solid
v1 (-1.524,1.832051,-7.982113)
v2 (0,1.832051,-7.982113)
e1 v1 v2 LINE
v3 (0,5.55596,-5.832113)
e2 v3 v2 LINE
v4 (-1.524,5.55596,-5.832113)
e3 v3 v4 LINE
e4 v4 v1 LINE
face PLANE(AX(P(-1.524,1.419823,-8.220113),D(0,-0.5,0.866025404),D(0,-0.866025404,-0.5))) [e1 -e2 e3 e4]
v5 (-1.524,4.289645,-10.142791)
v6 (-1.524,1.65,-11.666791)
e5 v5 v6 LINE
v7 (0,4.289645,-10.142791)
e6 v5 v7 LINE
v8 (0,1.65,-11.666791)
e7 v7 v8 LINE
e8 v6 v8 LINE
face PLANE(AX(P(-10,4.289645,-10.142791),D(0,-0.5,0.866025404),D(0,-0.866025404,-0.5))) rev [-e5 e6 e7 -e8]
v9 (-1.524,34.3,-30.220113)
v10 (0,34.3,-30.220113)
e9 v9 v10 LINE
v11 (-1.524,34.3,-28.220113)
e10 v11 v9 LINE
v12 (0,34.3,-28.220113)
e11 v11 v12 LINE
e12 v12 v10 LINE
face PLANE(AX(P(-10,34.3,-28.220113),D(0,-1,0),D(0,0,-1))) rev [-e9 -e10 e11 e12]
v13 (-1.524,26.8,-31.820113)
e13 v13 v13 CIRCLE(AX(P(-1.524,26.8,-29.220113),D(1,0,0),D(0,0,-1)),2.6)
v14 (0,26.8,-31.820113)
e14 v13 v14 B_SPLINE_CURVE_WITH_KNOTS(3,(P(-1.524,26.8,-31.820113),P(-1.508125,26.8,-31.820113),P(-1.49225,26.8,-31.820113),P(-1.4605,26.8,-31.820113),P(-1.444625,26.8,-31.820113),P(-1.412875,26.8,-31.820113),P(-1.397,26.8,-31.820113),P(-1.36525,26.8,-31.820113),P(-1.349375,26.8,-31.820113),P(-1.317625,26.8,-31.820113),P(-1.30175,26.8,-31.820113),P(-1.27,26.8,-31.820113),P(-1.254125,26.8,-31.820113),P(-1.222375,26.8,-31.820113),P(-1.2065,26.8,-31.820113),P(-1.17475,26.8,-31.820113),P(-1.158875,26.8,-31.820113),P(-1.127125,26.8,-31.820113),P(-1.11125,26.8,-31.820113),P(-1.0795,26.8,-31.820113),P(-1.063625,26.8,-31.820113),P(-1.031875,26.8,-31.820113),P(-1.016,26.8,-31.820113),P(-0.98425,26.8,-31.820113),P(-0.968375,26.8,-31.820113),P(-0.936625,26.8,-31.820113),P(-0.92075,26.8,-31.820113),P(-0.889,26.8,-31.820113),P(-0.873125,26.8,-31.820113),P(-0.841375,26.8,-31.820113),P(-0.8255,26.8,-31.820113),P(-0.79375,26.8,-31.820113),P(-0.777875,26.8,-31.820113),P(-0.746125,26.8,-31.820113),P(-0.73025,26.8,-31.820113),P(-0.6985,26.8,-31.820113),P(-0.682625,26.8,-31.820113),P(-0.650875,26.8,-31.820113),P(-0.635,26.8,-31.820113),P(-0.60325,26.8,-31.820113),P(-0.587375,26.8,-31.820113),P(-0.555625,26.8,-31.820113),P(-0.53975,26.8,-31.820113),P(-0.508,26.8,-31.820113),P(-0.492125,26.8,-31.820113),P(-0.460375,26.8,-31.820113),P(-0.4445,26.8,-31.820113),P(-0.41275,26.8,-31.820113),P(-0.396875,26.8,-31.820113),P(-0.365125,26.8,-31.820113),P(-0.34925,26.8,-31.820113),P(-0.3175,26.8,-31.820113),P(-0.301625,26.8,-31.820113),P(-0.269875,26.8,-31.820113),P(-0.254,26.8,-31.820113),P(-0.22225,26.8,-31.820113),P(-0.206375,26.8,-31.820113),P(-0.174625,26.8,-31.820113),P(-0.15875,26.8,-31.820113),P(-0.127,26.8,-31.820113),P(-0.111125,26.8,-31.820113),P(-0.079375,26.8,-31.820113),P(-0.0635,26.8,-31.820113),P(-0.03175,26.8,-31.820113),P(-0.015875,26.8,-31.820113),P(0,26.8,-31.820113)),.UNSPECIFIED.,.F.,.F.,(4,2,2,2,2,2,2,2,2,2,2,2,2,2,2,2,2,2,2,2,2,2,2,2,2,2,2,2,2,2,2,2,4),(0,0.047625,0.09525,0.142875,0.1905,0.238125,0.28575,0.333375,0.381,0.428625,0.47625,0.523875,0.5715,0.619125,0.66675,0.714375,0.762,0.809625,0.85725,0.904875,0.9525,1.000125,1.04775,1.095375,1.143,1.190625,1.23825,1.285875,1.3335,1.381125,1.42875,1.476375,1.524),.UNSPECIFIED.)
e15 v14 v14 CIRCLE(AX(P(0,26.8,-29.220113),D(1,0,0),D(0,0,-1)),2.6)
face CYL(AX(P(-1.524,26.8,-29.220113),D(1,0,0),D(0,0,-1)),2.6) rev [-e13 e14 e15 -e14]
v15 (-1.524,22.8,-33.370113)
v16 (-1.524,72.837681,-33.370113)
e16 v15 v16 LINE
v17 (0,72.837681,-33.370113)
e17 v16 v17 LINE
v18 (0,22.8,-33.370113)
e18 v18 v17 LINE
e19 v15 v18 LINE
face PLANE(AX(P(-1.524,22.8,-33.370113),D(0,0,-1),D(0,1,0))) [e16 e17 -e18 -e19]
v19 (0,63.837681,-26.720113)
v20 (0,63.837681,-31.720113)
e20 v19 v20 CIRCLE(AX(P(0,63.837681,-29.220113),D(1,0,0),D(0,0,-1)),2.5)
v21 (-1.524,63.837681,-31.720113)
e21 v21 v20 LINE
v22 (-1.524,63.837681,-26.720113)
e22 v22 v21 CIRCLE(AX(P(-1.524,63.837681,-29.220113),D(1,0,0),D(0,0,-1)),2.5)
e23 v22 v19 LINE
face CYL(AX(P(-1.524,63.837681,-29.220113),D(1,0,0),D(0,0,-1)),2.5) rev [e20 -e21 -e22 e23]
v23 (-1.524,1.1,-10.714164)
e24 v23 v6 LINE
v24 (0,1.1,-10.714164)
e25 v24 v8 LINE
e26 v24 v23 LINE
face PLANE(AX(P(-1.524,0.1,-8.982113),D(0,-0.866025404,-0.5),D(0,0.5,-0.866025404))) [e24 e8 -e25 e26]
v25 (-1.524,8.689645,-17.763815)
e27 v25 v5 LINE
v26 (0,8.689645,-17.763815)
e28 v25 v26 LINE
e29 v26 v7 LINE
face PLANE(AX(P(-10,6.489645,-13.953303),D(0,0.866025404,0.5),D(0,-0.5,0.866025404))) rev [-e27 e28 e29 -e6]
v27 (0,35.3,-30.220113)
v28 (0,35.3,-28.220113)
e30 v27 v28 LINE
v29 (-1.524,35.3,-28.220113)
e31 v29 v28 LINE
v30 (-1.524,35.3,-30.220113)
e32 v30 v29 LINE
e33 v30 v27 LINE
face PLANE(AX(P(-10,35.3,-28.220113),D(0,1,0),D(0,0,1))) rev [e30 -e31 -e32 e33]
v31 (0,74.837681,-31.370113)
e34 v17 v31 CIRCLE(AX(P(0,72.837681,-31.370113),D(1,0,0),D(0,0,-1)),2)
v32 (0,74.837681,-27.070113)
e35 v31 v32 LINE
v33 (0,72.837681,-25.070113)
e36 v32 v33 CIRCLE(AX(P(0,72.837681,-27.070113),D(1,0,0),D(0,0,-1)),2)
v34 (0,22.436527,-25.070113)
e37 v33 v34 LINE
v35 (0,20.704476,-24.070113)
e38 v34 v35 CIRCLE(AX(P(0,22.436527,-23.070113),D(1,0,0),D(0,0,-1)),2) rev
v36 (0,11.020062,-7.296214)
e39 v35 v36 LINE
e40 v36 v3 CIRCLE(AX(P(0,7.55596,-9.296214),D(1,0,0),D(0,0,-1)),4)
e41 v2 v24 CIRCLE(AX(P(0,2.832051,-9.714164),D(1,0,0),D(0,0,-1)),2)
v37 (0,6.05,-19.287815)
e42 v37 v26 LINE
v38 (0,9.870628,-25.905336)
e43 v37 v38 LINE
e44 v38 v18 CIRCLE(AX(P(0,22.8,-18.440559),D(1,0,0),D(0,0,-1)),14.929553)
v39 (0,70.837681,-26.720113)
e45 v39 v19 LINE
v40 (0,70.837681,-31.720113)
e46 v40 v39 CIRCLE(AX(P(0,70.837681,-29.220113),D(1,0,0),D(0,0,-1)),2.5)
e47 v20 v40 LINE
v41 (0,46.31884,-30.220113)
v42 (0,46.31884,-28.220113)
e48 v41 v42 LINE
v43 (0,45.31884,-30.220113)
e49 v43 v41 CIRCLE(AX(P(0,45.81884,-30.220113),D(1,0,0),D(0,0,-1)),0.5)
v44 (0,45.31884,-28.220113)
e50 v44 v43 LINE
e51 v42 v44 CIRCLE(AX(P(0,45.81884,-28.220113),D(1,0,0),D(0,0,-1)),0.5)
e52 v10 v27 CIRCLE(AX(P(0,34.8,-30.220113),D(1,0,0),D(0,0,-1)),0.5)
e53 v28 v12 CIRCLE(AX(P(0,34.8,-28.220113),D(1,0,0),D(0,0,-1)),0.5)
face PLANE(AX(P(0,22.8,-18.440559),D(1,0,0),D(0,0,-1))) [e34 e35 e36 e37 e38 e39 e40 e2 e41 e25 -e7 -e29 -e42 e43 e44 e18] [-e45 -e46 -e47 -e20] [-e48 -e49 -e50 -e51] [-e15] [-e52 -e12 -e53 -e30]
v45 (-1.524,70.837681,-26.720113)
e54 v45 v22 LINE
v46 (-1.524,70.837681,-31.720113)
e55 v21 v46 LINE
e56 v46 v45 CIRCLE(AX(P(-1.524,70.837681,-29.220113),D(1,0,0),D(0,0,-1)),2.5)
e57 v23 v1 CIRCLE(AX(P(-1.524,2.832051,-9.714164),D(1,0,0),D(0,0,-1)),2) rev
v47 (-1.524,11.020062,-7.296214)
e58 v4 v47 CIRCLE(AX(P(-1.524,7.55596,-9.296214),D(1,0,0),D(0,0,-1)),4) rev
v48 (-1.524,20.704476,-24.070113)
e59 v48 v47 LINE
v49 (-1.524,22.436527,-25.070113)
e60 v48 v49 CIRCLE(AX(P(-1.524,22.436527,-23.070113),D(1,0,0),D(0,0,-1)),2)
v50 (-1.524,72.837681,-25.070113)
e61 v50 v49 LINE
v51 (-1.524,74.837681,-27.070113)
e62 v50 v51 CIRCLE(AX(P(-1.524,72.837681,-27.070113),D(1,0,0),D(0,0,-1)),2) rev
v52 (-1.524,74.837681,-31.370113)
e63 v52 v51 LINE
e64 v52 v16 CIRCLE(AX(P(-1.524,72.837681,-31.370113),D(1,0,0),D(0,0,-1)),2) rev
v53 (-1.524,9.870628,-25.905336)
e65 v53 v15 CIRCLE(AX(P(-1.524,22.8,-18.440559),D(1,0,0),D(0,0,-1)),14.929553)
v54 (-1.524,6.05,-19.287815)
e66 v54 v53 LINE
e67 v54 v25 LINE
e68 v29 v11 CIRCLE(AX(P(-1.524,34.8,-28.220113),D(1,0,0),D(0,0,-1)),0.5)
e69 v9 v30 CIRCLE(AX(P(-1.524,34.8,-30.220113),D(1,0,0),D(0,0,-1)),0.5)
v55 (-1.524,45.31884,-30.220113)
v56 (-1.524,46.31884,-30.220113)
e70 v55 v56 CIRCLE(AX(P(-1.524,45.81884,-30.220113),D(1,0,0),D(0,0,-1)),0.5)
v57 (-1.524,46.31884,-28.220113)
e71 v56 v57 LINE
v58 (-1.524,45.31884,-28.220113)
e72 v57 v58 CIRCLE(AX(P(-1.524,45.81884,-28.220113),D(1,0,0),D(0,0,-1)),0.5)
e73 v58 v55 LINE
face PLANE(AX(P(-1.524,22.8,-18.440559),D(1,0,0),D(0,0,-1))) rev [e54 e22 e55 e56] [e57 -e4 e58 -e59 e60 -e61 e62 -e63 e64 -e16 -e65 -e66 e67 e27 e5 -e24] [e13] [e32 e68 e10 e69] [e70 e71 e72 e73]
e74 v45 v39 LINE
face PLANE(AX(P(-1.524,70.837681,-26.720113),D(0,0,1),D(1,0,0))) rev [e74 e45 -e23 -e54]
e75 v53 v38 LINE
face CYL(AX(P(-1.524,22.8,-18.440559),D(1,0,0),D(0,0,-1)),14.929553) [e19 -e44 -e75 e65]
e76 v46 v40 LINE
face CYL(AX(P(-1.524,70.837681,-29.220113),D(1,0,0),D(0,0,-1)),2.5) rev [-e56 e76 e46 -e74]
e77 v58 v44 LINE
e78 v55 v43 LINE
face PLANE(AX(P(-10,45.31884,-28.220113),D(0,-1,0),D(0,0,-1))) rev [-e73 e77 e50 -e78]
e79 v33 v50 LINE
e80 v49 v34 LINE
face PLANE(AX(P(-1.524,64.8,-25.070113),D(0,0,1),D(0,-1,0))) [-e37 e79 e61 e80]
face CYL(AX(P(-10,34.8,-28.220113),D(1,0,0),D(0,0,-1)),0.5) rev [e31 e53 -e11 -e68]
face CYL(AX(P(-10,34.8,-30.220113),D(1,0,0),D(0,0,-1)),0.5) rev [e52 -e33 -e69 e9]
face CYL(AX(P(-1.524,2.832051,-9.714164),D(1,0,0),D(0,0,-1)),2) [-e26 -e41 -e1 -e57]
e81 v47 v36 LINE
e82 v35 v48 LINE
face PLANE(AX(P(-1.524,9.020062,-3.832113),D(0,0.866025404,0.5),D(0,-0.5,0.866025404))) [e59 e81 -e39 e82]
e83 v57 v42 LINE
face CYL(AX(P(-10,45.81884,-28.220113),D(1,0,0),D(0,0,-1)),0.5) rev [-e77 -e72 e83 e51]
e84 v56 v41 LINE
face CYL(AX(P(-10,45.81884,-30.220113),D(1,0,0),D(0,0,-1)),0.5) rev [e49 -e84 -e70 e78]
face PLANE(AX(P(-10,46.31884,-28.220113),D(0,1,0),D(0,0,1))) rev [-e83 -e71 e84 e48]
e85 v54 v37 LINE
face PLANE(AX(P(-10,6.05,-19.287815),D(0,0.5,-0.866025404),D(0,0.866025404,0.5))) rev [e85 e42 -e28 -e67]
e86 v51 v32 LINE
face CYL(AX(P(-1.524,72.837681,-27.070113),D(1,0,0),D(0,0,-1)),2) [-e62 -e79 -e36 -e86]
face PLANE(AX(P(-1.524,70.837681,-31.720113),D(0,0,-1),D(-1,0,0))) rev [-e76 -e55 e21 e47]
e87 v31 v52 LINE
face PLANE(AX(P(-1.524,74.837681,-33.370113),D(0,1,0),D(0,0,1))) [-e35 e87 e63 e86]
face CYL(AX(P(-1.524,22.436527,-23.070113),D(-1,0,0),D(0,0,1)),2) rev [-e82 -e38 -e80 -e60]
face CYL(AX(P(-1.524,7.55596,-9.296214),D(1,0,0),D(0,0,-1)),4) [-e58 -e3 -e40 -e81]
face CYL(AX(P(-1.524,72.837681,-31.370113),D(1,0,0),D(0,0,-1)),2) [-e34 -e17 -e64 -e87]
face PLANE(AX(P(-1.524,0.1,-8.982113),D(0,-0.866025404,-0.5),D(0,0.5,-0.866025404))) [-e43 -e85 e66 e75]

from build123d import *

# Parameters (mm, degrees)
SKETCH1_R            = 2.6
BASE_FLANGE1_DEPTH   = 1.524
KEYING_DEPTH         = 10
FILLET1_R            = 2
FILLET2_R            = 4
JOG1_START           = -33.370112718
JOG1_DEPTH           = 8.3
JOG1_2_DEPTH         = 8.3
JOG1_START_2         = 10.476
JOG1_3_DEPTH         = 1.524
CUT_EXTRUDE1_DEPTH   = 12
CUT_EXTRUDE1_START   = -1.524
CUT_EXTRUDE1_2_DEPTH = 1.524
CUT_EXTRUDE1_3_DEPTH = 1.524


with BuildPart() as part:
    # Base-Flange1: sheet metal written as solids
    # Sketch1 → Base-Flange1 (new body)
    with BuildSketch(Plane(origin=(0, 0, 0), x_dir=(0, 0, -1), z_dir=(1, 0, 0))):
        with BuildLine():
            Line((33.370112718, 22.8), (33.370112718, 64.8))
            Line((33.370112718, 64.8), (25.070112718, 64.8))
            Line((25.070112718, 64.8), (25.070112718, 21.281826676))
            Line((25.070112718, 21.281826676), (3.832112718, 9.020061659))
            Line((3.832112718, 9.020061659), (8.220112718, 1.419822715))
            Line((8.220112718, 1.419822715), (8.982112718, 0.1))
            Line((8.982112718, 0.1), (25.905336052, 9.870627547))
            ThreePointArc((25.905336052, 9.870627547), (31.369931839, 15.335223334), (33.370112718, 22.8))
        make_face()
        with Locations((29.220112718, 26.8)):
            Circle(SKETCH1_R, mode=Mode.SUBTRACT)
        with BuildLine():
            Line((31.720112718, 60.8), (31.720112718, 53.8))
            ThreePointArc((31.720112718, 53.8), (29.220112718, 51.3), (26.720112718, 53.8))
            Line((26.720112718, 53.8), (26.720112718, 60.8))
            ThreePointArc((26.720112718, 60.8), (29.220112718, 63.3), (31.720112718, 60.8))
        make_face(mode=Mode.SUBTRACT)
    extrude(amount=-BASE_FLANGE1_DEPTH)

    # Sketch6 → Keying (cut)
    with BuildSketch(Plane(origin=(0, 0, 0), x_dir=(0, 0, -1), z_dir=(1, 0, 0))):
        Polygon((19.287815023, 6.05), (17.763815023, 8.689645431), (13.953303246, 6.489645431), (10.14279147, 4.289645431), (11.66679147, 1.65), (15.701110868, 3.97921539), align=None)
    extrude(amount=-KEYING_DEPTH, mode=Mode.SUBTRACT)

    # Fillet1
    fillet1_edges = [part.edges().sort_by_distance(p)[0] for p in [
        (-0.762, 0.1, -8.982112718),
        (-0.762, 21.281826676, -25.070112718),
        (-0.762, 64.8, -25.070112718),
        (-0.762, 64.8, -33.370112718),
    ]]
    fillet(fillet1_edges, radius=FILLET1_R)

    # Fillet2
    fillet2_edges = [part.edges().sort_by_distance(p)[0] for p in [
        (-0.762, 9.020061659, -3.832112718),
    ]]
    fillet(fillet2_edges, radius=FILLET2_R)

    # Jog1: read off the stored shape, not the designer's step
    # Jog1 outline → Jog1 (cut)
    with BuildSketch(Plane.XY.offset(JOG1_START)):
        with BuildLine():
            ThreePointArc((-1.524, 33.004579798), (-1.115645431, 34.528579798), (0, 35.644225229))
            Line((0, 35.644225229), (0, 64.8))
            Line((0, 64.8), (-1.524, 64.8))
            Line((-1.524, 64.8), (-1.524, 33.004579798))
        make_face()
    extrude(amount=JOG1_DEPTH, mode=Mode.SUBTRACT)

    # Jog1 2 outline → Jog1 2 (add)
    with BuildSketch(Plane.XY.offset(JOG1_START)):
        with BuildLine():
            ThreePointArc((0, 33.004579798), (0.446369265, 34.082210533), (1.524, 34.528579798))
            Line((1.524, 34.528579798), (8.952, 34.528579798))
            ThreePointArc((8.952, 34.528579798), (11.107261469, 35.421318329), (12, 37.576579798))
            Line((12, 37.576579798), (12, 64.8))
            Line((12, 64.8), (10.476, 64.8))
            Line((10.476, 64.8), (10.476, 37.576579798))
            ThreePointArc((10.476, 37.576579798), (10.029630734, 36.498949063), (8.952, 36.052579798))
            Line((8.952, 36.052579798), (1.524, 36.052579798))
            ThreePointArc((1.524, 36.052579798), (0.73511955, 35.948721717), (0, 35.644225229))
            Line((0, 35.644225229), (0, 33.004579798))
        make_face()
    extrude(amount=JOG1_2_DEPTH)

    # Jog1 3 outline → Jog1 3 (cut)
    with BuildSketch(Plane.YZ.offset(JOG1_START_2)):
        with BuildLine():
            ThreePointArc((62.8, -25.070112718), (64.214213562, -25.655899156), (64.8, -27.070112718))
            Line((64.8, -27.070112718), (64.8, -25.070112718))
            Line((64.8, -25.070112718), (62.8, -25.070112718))
        make_face()
        with BuildLine():
            ThreePointArc((64.8, -31.370112718), (64.214213562, -32.78432628), (62.8, -33.370112718))
            Line((62.8, -33.370112718), (64.8, -33.370112718))
            Line((64.8, -33.370112718), (64.8, -31.370112718))
        make_face()
        with BuildLine():
            Line((60.8, -26.720112718), (53.8, -26.720112718))
            ThreePointArc((53.8, -26.720112718), (51.3, -29.220112718), (53.8, -31.720112718))
            Line((53.8, -31.720112718), (60.8, -31.720112718))
            ThreePointArc((60.8, -31.720112718), (63.3, -29.220112718), (60.8, -26.720112718))
        make_face()
    extrude(amount=JOG1_3_DEPTH, mode=Mode.SUBTRACT)

    # Cut-Extrude1: read off the stored shape, not the designer's step
    # Cut-Extrude1 outline → Cut-Extrude1 (cut)
    with BuildSketch(Plane(origin=(0, 0, 0), x_dir=(0, 0, -1), z_dir=(1, 0, 0))):
        with BuildLine():
            Line((25.070112718, 32), (33.370112718, 32))
            Line((33.370112718, 32), (33.370112718, 62.8))
            ThreePointArc((33.370112718, 62.8), (32.78432628, 64.214213562), (31.370112718, 64.8))
            Line((31.370112718, 64.8), (27.070112718, 64.8))
            ThreePointArc((27.070112718, 64.8), (25.655899156, 64.214213562), (25.070112718, 62.8))
            Line((25.070112718, 62.8), (25.070112718, 32))
        make_face()
        with BuildLine():
            ThreePointArc((26.720112718, 60.8), (29.220112718, 63.3), (31.720112718, 60.8))
            Line((31.720112718, 60.8), (31.720112718, 53.8))
            ThreePointArc((31.720112718, 53.8), (29.220112718, 51.3), (26.720112718, 53.8))
            Line((26.720112718, 53.8), (26.720112718, 60.8))
        make_face(mode=Mode.SUBTRACT)
    extrude(amount=CUT_EXTRUDE1_DEPTH, mode=Mode.SUBTRACT)

    # Cut-Extrude1 2 outline → Cut-Extrude1 2 (cut)
    with BuildSketch(Plane(origin=(0, 0, 0), x_dir=(0, 0, -1), z_dir=(1, 0, 0)).offset(CUT_EXTRUDE1_START)):
        with BuildLine():
            ThreePointArc((28.220112718, 35.3), (27.720112718, 34.8), (28.220112718, 34.3))
            Line((28.220112718, 34.3), (30.220112718, 34.3))
            ThreePointArc((30.220112718, 34.3), (30.720112718, 34.8), (30.220112718, 35.3))
            Line((30.220112718, 35.3), (28.220112718, 35.3))
        make_face()
    extrude(amount=CUT_EXTRUDE1_2_DEPTH, mode=Mode.SUBTRACT)

    # Cut-Extrude1 3 outline → Cut-Extrude1 3 (add)
    with BuildSketch(Plane(origin=(0, 0, 0), x_dir=(0, 0, -1), z_dir=(1, 0, 0)).offset(CUT_EXTRUDE1_START)):
        with BuildLine():
            Line((25.070112718, 32), (33.370112718, 32))
            Line((33.370112718, 32), (33.370112718, 72.837680806))
            ThreePointArc((33.370112718, 72.837680806), (32.78432628, 74.251894368), (31.370112718, 74.837680806))
            Line((31.370112718, 74.837680806), (27.070112718, 74.837680806))
            ThreePointArc((27.070112718, 74.837680806), (25.655899156, 74.251894368), (25.070112718, 72.837680806))
            Line((25.070112718, 72.837680806), (25.070112718, 32))
        make_face()
        with BuildLine():
            ThreePointArc((28.220112718, 34.3), (27.720112718, 34.8), (28.220112718, 35.3))
            Line((28.220112718, 35.3), (30.220112718, 35.3))
            ThreePointArc((30.220112718, 35.3), (30.720112718, 34.8), (30.220112718, 34.3))
            Line((30.220112718, 34.3), (28.220112718, 34.3))
        make_face(mode=Mode.SUBTRACT)
        with BuildLine():
            Line((28.220112718, 46.318840403), (30.220112718, 46.318840403))
            ThreePointArc((30.220112718, 46.318840403), (30.720112718, 45.818840403), (30.220112718, 45.318840403))
            Line((30.220112718, 45.318840403), (28.220112718, 45.318840403))
            ThreePointArc((28.220112718, 45.318840403), (27.720112718, 45.818840403), (28.220112718, 46.318840403))
        make_face(mode=Mode.SUBTRACT)
        with BuildLine():
            Line((26.720112718, 63.837680806), (26.720112718, 70.837680806))
            ThreePointArc((26.720112718, 70.837680806), (29.220112718, 73.337680806), (31.720112718, 70.837680806))
            Line((31.720112718, 70.837680806), (31.720112718, 63.837680806))
            ThreePointArc((31.720112718, 63.837680806), (29.220112718, 61.337680806), (26.720112718, 63.837680806))
        make_face(mode=Mode.SUBTRACT)
    extrude(amount=CUT_EXTRUDE1_3_DEPTH)


solid = part.part
